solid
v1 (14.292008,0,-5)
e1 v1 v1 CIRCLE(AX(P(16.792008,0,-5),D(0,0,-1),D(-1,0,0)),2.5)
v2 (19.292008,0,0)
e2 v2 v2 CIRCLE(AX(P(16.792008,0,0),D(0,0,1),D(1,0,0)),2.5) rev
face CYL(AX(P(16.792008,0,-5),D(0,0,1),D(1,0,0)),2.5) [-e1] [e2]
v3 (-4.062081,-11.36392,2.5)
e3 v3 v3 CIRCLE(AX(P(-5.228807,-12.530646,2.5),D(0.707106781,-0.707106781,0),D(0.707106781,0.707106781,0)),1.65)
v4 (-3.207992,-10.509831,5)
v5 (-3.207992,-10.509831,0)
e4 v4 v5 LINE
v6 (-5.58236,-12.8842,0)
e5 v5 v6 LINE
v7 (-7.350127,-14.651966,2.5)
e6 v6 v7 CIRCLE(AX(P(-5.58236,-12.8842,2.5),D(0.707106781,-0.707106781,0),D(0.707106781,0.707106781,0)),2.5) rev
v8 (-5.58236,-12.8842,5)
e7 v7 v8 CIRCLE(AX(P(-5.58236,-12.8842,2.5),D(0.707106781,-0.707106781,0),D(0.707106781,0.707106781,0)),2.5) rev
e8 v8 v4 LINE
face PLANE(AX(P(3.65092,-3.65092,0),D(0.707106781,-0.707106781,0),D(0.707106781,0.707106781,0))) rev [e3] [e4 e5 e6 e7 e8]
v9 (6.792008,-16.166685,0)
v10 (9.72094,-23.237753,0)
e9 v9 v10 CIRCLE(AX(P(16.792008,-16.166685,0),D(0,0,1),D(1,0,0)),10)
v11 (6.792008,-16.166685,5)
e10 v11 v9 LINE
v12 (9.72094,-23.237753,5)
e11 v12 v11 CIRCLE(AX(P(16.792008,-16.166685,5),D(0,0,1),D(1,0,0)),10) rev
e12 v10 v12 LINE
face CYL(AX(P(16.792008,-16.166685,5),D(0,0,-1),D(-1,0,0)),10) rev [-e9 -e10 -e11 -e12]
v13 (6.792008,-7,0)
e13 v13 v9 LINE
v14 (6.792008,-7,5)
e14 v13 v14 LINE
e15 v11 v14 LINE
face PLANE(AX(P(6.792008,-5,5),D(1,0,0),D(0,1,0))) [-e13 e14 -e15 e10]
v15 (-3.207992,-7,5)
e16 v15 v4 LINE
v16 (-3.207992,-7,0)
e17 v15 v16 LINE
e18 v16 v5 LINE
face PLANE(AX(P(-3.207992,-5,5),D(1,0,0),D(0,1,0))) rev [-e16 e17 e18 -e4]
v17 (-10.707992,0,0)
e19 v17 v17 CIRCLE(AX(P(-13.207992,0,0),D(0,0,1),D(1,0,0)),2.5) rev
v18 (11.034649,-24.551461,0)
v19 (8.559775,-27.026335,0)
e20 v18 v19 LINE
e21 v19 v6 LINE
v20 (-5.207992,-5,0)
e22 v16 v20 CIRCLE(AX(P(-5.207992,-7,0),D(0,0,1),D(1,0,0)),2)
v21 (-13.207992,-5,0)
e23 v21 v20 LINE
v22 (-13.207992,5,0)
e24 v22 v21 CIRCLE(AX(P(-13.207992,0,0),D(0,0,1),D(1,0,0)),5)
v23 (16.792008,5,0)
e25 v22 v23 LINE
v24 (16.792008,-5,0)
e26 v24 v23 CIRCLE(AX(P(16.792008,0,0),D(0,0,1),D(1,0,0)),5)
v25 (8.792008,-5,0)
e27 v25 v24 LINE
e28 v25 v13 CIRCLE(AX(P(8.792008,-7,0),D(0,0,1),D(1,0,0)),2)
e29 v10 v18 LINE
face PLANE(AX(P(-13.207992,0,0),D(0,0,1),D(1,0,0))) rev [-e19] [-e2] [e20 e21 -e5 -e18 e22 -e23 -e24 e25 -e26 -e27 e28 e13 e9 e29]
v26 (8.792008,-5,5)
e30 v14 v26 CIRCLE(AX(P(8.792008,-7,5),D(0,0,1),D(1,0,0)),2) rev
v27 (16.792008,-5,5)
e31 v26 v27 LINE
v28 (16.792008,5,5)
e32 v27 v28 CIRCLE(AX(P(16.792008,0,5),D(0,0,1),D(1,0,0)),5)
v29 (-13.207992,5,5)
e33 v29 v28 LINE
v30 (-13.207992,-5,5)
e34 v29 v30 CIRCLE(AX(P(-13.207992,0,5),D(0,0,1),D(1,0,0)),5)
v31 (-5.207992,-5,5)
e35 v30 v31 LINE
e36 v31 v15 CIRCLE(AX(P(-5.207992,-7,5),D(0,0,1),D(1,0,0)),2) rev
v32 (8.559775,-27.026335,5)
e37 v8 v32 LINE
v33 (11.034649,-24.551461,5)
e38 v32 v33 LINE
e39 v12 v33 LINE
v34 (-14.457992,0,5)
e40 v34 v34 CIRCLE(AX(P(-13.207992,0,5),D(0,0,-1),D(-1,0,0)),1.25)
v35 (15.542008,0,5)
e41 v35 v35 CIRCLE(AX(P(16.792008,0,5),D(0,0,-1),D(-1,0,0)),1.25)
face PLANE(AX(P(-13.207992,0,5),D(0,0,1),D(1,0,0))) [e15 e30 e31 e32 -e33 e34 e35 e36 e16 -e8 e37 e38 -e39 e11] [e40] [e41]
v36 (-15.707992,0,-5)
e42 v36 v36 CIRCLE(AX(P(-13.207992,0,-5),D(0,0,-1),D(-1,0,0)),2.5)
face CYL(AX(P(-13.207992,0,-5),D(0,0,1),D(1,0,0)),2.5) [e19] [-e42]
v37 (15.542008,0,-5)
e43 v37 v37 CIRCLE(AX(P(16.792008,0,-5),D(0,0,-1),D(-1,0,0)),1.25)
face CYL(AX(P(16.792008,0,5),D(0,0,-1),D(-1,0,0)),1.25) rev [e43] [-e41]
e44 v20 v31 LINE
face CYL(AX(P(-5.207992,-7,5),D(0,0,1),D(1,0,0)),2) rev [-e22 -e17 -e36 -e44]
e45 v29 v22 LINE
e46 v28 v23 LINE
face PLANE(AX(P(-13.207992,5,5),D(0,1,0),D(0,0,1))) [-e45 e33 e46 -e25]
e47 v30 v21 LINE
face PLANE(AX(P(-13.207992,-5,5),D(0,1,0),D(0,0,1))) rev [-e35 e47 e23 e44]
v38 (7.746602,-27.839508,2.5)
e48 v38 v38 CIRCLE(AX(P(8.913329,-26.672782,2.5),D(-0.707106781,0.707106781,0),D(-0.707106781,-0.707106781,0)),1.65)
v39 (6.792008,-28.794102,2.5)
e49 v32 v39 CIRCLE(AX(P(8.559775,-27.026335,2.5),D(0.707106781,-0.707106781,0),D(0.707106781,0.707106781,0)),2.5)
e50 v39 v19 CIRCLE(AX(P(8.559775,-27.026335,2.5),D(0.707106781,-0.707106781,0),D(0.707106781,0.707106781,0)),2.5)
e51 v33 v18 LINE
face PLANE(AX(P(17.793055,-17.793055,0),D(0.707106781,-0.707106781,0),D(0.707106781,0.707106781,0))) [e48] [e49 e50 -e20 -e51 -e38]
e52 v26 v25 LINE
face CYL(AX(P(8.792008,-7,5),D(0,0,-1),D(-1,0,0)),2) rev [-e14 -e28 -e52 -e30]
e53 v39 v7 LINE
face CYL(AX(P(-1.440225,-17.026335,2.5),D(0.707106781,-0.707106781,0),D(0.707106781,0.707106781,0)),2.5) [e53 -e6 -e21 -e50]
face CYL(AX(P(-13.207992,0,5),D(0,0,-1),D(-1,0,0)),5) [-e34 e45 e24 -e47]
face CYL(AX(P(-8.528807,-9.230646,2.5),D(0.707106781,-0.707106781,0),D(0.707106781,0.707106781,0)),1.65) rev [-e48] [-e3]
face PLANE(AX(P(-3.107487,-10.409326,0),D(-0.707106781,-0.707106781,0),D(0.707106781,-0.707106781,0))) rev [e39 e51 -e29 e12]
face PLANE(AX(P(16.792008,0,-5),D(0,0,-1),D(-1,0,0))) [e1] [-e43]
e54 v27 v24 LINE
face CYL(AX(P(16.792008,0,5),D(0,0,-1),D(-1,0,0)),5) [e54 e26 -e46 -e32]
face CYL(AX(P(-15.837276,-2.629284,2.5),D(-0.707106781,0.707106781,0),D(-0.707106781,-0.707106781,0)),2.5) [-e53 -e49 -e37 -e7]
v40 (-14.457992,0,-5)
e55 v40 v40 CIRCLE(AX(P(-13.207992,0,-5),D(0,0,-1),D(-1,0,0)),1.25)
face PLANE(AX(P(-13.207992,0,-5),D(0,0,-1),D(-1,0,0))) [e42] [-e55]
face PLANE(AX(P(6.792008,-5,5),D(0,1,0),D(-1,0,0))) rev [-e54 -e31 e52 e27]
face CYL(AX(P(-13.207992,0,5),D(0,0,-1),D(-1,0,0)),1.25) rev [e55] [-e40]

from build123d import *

# Parameters (mm, degrees)
ESTRUSIONE_ESTRUSIONE3_DEPTH = 5
SCHIZZO3_R                   = 2.5
ESTRUSIONE_ESTRUSIONE4_DEPTH = 5
SCHIZZO7_W                   = 5
SCHIZZO7_H                   = 6
ESTRUSIONE_ESTRUSIONE5_DEPTH = 20
SCHIZZO6_R                   = 1.65
TAGLIO_ESTRUSIONE1_DEPTH     = 20
RACCORDO1_R                  = 2.5
SCHIZZO8_R                   = 1.25
TAGLIO_ESTRUSIONE2_DEPTH     = 38.469880381
RACCORDO2_R                  = 2
RACCORDO3_R                  = 10


with BuildPart() as part:
    # Schizzo1 → Estrusione-Estrusione3 (new body)
    with BuildSketch(Plane.XY):
        with BuildLine():
            Line((-13.207991803, 5), (16.792008197, 5))
            ThreePointArc((16.792008197, 5), (21.792008197, 0), (16.792008197, -5))
            Line((16.792008197, -5), (6.792008197, -5))
            Line((6.792008197, -5), (6.792008197, -18.794102079))
            Line((6.792008197, -18.794102079), (6.792008197, -28.794102079))
            Line((6.792008197, -28.794102079), (-3.207991803, -18.794102079))
            Line((-3.207991803, -18.794102079), (-3.207991803, -5))
            Line((-3.207991803, -5), (-13.207991803, -5))
            ThreePointArc((-13.207991803, -5), (-18.207991803, 0), (-13.207991803, 5))
        make_face()
    extrude(amount=ESTRUSIONE_ESTRUSIONE3_DEPTH)

    # Schizzo3 → Estrusione-Estrusione4 (add)
    with BuildSketch(Plane(origin=(0, 0, 0), x_dir=(-1, 0, 0), z_dir=(0, 0, -1))):
        with Locations(Location((-16.792008197, 0, 0), (0, 0, 180))):
            Circle(SCHIZZO3_R)
        with Locations(Location((13.207991803, 0, 0), (0, 0, 180))):
            Circle(SCHIZZO3_R)
    extrude(amount=ESTRUSIONE_ESTRUSIONE4_DEPTH)

    # Schizzo7 → Estrusione-Estrusione5 (add)
    with BuildSketch(Plane(origin=(17.793055138, -17.793055138, 0), x_dir=(0, 0, -1), z_dir=(-0.7071067811865562, 0.7071067811865389, 0))):
        with Locations((-2.5, 12.557829784)):
            Rectangle(SCHIZZO7_W, SCHIZZO7_H)
    extrude(amount=ESTRUSIONE_ESTRUSIONE5_DEPTH)

    # Schizzo6 → Taglio-Estrusione1 (cut)
    with BuildSketch(Plane(origin=(17.793055138, -17.793055138, 0), x_dir=(0, 0, -1), z_dir=(-0.7071067811865562, 0.7071067811865389, 0))):
        with Locations(Location((-2.5, 12.557829784, 0), (0, 0, 270))):
            Circle(SCHIZZO6_R)
    extrude(amount=TAGLIO_ESTRUSIONE1_DEPTH, mode=Mode.SUBTRACT)

    # Raccordo1
    raccordo1_edges = [part.edges().sort_by_distance(p)[0] for p in [
        (-0.279059615, -21.723034267, 0),
        (-0.279059615, -21.723034267, 5),
    ]]
    fillet(raccordo1_edges, radius=RACCORDO1_R - 0.0001)  # a hair under: the kernel refuses the full size

    # Schizzo8 → Taglio-Estrusione2 (cut, through all)
    with BuildSketch(Plane(origin=(0, 0, -5), x_dir=(-1, 0, 0), z_dir=(0, 0, -1))):
        with Locations((-16.792008197, 0)):
            Circle(SCHIZZO8_R)
        with Locations((13.207991803, 0)):
            Circle(SCHIZZO8_R)
    extrude(amount=-TAGLIO_ESTRUSIONE2_DEPTH, mode=Mode.SUBTRACT)

    # Raccordo2
    raccordo2_edges = [part.edges().sort_by_distance(p)[0] for p in [
        (6.792008197, -5, 2.5),
        (-3.207991803, -5, 2.5),
    ]]
    fillet(raccordo2_edges, radius=RACCORDO2_R)

    # Raccordo3
    raccordo3_edges = [part.edges().sort_by_distance(p)[0] for p in [
        (6.792008197, -20.308820704, 2.5),
    ]]
    fillet(raccordo3_edges, radius=RACCORDO3_R)


solid = part.part
